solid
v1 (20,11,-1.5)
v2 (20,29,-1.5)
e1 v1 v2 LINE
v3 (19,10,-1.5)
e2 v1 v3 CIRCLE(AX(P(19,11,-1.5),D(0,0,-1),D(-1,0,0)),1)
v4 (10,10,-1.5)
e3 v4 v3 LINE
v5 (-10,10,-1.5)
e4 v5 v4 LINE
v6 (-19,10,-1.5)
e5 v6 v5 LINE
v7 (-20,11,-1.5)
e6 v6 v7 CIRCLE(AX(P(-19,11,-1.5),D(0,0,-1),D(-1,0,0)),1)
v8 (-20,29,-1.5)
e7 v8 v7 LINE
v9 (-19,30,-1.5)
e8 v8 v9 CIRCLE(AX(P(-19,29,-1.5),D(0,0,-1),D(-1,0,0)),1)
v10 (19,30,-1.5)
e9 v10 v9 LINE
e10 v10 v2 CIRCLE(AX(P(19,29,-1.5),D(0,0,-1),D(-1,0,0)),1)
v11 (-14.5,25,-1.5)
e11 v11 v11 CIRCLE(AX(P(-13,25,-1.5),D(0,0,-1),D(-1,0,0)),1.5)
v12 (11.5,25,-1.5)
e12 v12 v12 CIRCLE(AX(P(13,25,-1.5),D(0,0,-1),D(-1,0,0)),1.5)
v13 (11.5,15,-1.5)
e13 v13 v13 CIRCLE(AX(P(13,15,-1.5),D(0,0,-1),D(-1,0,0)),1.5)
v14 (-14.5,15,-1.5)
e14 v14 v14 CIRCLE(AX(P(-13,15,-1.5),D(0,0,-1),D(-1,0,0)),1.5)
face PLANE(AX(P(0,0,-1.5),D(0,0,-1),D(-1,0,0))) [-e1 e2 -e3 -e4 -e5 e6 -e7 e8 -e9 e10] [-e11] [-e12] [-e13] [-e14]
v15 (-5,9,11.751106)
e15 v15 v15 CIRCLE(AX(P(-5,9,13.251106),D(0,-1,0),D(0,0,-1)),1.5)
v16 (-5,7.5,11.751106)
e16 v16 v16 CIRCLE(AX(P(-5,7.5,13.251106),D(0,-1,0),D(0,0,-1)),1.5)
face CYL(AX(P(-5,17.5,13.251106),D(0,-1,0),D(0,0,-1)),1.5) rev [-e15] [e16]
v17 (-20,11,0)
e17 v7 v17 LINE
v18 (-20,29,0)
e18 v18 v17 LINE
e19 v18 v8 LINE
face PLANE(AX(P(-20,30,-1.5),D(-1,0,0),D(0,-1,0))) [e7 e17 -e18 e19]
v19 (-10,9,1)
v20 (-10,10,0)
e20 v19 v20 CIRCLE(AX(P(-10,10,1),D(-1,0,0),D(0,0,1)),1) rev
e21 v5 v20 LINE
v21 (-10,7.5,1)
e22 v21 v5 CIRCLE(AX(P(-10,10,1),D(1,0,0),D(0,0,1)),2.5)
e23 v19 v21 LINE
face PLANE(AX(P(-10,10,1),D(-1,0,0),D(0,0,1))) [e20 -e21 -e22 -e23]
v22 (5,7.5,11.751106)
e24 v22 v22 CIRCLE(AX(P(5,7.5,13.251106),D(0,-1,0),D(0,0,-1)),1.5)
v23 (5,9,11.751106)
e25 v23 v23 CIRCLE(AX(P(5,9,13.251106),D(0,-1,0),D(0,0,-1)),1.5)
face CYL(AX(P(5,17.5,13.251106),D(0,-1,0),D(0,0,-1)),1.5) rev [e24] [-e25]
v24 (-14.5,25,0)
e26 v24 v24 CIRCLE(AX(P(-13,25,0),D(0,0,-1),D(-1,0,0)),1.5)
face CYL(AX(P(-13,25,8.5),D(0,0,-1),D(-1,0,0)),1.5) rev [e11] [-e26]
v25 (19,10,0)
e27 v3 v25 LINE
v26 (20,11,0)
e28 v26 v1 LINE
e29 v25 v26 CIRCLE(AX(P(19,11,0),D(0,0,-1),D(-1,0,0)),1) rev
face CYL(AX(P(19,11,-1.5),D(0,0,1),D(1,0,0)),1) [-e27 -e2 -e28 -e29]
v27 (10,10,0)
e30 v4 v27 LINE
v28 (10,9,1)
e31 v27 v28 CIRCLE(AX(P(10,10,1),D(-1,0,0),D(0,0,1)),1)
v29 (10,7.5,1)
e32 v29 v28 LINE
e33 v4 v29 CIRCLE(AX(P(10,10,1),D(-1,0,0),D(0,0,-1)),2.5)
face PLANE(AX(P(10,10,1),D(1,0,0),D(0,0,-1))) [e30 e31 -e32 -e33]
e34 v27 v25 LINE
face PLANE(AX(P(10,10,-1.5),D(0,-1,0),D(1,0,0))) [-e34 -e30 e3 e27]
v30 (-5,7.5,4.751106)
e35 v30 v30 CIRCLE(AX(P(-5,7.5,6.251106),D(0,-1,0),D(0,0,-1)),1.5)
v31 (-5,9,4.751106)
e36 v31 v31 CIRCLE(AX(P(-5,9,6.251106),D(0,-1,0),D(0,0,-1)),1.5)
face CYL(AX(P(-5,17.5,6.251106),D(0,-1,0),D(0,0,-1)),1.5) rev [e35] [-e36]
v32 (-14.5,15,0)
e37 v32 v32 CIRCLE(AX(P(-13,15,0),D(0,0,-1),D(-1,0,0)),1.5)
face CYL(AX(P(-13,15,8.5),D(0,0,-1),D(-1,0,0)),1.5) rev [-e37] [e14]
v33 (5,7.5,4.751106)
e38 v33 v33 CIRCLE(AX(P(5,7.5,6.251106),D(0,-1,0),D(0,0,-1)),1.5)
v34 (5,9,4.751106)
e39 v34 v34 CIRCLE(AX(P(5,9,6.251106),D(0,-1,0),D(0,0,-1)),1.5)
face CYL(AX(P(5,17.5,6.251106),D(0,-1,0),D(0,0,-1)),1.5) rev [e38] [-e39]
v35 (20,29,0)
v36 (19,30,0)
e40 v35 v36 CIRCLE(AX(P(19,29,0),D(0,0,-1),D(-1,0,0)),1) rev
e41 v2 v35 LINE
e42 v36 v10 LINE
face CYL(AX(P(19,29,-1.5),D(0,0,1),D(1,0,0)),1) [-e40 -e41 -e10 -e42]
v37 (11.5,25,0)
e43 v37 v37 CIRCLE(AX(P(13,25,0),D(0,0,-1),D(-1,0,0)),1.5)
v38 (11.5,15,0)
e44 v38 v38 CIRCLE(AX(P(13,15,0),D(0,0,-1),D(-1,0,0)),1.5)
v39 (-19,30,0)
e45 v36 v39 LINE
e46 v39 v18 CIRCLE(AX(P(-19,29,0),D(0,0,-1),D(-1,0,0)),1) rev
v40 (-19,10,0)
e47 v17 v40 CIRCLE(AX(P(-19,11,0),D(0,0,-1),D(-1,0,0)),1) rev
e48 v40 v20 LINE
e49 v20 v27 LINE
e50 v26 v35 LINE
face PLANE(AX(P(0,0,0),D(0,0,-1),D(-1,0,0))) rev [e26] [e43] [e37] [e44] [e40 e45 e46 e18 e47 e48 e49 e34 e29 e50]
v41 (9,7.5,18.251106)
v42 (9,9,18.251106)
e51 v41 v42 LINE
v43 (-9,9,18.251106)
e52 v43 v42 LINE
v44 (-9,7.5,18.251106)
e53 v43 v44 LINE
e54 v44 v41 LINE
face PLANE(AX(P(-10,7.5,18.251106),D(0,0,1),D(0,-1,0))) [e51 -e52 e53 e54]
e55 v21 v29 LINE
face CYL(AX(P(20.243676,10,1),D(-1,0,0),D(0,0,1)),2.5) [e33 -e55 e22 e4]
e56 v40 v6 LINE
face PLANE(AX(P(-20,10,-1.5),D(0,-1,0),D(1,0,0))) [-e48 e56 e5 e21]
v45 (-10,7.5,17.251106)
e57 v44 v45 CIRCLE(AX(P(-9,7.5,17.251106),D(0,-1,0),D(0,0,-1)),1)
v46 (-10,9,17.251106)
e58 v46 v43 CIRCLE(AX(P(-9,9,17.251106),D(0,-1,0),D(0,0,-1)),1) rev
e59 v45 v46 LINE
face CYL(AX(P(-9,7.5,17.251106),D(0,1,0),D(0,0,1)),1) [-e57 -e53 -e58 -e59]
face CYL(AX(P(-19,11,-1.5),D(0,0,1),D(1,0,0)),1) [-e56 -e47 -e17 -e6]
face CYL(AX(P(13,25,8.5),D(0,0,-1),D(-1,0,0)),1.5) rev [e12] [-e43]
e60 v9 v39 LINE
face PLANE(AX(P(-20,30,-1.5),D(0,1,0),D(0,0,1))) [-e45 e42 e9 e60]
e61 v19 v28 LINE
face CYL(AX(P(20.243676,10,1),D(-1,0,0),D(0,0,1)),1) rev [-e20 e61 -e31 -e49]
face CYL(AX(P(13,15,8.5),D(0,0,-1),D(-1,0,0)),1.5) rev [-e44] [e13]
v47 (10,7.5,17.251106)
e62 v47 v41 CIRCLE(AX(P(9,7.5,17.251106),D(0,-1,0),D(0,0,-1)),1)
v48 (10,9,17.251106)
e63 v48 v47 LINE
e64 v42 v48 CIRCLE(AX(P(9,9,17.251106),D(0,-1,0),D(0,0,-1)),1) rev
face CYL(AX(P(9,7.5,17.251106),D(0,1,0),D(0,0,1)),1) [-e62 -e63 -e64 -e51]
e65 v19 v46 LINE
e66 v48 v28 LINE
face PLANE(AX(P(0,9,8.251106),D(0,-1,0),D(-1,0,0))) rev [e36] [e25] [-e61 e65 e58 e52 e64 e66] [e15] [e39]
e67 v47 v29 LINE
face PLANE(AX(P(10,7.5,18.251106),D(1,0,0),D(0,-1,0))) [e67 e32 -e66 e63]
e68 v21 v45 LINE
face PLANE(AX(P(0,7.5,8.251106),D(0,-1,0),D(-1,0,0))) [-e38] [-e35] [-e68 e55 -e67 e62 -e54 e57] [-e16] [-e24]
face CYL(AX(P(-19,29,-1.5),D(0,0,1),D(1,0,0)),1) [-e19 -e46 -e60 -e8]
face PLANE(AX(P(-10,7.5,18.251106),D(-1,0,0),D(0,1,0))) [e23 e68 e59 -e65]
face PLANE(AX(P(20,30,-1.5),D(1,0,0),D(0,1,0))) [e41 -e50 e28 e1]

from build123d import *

# Parameters (mm, degrees)
SM_BASE_FLANGE_1_DEPTH = 1.5
OTHER_START            = -10
OTHER_1_DEPTH          = 20
OTHER_1_2_DEPTH        = 20
FILLET_1_R             = 1
SKETCH_7_R             = 1.5
CUT_EXTRUDE_1_DEPTH    = 10
SKETCH_8_R             = 1.5
CUT_EXTRUDE_2_DEPTH    = 10


# Read off the part's stored shape, not the designer's step: 绘制的折弯1
# Sheet-metal steps are written as plain solids
with BuildPart() as part:
    # Sketch 1 → 基体-法兰1 (new body)
    with BuildSketch(Plane.XY):
        Polygon((10, 10), (20, 10), (20, 30), (-20, 30), (-20, 10), (-10, 10), (-10, -10), (10, -10), align=None)
    extrude(amount=-SM_BASE_FLANGE_1_DEPTH)

    # Other 1 outline → Other 1 (cut)
    with BuildSketch(Plane.YZ.offset(OTHER_START)):
        with BuildLine():
            ThreePointArc((10, -1.5), (8.630693606, -1.091650066), (7.708712152, 0))
            Line((7.708712152, 0), (-10, 0))
            Line((-10, 0), (-10, -1.5))
            Line((-10, -1.5), (10, -1.5))
        make_face()
    extrude(amount=OTHER_1_DEPTH, mode=Mode.SUBTRACT)

    # Other 1 2 outline → Other 1 2 (add)
    with BuildSketch(Plane.YZ.offset(OTHER_START)):
        with BuildLine():
            Line((9, 18.251106428), (7.5, 18.251106428))
            Line((7.5, 18.251106428), (7.5, 1))
            ThreePointArc((7.5, 1), (7.552734218, 0.489225891), (7.708712152, 0))
            Line((7.708712152, 0), (10, 0))
            ThreePointArc((10, 0), (9.292893219, 0.292893219), (9, 1))
            Line((9, 1), (9, 18.251106428))
        make_face()
    extrude(amount=OTHER_1_2_DEPTH)

    # 圆角1
    fillet_1_edges = [part.edges().sort_by_distance(p)[0] for p in [
        (10, 8.25, 18.251106428),
        (-10, 8.25, 18.251106428),
        (20, 30, -0.75),
        (-20, 30, -0.75),
        (-20, 10, -0.75),
        (20, 10, -0.75),
    ]]
    fillet(fillet_1_edges, radius=FILLET_1_R)

    # 草图7 → 切除-拉伸1 (cut)
    with BuildSketch(Plane(origin=(0, 0, -1.5), x_dir=(-1, 0, 0), z_dir=(0, 0, -1))):
        with Locations((-13, 25)):
            Circle(SKETCH_7_R)
        with Locations((13, 25)):
            Circle(SKETCH_7_R)
        with Locations((-13, 15)):
            Circle(SKETCH_7_R)
        with Locations((13, 15)):
            Circle(SKETCH_7_R)
    extrude(amount=-CUT_EXTRUDE_1_DEPTH, mode=Mode.SUBTRACT)

    # 草图8 → 切除-拉伸2 (cut)
    with BuildSketch(Plane.XZ.offset(-7.5)):
        with Locations(Location((-5, 13.251106428, 0), (0, 0, 270))):
            Circle(SKETCH_8_R)
        with Locations(Location((5, 13.251106428, 0), (0, 0, 270))):
            Circle(SKETCH_8_R)
        with Locations(Location((-5, 6.251106428, 0), (0, 0, 270))):
            Circle(SKETCH_8_R)
        with Locations(Location((5, 6.251106428, 0), (0, 0, 270))):
            Circle(SKETCH_8_R)
    extrude(amount=-CUT_EXTRUDE_2_DEPTH, mode=Mode.SUBTRACT)


solid = part.part
